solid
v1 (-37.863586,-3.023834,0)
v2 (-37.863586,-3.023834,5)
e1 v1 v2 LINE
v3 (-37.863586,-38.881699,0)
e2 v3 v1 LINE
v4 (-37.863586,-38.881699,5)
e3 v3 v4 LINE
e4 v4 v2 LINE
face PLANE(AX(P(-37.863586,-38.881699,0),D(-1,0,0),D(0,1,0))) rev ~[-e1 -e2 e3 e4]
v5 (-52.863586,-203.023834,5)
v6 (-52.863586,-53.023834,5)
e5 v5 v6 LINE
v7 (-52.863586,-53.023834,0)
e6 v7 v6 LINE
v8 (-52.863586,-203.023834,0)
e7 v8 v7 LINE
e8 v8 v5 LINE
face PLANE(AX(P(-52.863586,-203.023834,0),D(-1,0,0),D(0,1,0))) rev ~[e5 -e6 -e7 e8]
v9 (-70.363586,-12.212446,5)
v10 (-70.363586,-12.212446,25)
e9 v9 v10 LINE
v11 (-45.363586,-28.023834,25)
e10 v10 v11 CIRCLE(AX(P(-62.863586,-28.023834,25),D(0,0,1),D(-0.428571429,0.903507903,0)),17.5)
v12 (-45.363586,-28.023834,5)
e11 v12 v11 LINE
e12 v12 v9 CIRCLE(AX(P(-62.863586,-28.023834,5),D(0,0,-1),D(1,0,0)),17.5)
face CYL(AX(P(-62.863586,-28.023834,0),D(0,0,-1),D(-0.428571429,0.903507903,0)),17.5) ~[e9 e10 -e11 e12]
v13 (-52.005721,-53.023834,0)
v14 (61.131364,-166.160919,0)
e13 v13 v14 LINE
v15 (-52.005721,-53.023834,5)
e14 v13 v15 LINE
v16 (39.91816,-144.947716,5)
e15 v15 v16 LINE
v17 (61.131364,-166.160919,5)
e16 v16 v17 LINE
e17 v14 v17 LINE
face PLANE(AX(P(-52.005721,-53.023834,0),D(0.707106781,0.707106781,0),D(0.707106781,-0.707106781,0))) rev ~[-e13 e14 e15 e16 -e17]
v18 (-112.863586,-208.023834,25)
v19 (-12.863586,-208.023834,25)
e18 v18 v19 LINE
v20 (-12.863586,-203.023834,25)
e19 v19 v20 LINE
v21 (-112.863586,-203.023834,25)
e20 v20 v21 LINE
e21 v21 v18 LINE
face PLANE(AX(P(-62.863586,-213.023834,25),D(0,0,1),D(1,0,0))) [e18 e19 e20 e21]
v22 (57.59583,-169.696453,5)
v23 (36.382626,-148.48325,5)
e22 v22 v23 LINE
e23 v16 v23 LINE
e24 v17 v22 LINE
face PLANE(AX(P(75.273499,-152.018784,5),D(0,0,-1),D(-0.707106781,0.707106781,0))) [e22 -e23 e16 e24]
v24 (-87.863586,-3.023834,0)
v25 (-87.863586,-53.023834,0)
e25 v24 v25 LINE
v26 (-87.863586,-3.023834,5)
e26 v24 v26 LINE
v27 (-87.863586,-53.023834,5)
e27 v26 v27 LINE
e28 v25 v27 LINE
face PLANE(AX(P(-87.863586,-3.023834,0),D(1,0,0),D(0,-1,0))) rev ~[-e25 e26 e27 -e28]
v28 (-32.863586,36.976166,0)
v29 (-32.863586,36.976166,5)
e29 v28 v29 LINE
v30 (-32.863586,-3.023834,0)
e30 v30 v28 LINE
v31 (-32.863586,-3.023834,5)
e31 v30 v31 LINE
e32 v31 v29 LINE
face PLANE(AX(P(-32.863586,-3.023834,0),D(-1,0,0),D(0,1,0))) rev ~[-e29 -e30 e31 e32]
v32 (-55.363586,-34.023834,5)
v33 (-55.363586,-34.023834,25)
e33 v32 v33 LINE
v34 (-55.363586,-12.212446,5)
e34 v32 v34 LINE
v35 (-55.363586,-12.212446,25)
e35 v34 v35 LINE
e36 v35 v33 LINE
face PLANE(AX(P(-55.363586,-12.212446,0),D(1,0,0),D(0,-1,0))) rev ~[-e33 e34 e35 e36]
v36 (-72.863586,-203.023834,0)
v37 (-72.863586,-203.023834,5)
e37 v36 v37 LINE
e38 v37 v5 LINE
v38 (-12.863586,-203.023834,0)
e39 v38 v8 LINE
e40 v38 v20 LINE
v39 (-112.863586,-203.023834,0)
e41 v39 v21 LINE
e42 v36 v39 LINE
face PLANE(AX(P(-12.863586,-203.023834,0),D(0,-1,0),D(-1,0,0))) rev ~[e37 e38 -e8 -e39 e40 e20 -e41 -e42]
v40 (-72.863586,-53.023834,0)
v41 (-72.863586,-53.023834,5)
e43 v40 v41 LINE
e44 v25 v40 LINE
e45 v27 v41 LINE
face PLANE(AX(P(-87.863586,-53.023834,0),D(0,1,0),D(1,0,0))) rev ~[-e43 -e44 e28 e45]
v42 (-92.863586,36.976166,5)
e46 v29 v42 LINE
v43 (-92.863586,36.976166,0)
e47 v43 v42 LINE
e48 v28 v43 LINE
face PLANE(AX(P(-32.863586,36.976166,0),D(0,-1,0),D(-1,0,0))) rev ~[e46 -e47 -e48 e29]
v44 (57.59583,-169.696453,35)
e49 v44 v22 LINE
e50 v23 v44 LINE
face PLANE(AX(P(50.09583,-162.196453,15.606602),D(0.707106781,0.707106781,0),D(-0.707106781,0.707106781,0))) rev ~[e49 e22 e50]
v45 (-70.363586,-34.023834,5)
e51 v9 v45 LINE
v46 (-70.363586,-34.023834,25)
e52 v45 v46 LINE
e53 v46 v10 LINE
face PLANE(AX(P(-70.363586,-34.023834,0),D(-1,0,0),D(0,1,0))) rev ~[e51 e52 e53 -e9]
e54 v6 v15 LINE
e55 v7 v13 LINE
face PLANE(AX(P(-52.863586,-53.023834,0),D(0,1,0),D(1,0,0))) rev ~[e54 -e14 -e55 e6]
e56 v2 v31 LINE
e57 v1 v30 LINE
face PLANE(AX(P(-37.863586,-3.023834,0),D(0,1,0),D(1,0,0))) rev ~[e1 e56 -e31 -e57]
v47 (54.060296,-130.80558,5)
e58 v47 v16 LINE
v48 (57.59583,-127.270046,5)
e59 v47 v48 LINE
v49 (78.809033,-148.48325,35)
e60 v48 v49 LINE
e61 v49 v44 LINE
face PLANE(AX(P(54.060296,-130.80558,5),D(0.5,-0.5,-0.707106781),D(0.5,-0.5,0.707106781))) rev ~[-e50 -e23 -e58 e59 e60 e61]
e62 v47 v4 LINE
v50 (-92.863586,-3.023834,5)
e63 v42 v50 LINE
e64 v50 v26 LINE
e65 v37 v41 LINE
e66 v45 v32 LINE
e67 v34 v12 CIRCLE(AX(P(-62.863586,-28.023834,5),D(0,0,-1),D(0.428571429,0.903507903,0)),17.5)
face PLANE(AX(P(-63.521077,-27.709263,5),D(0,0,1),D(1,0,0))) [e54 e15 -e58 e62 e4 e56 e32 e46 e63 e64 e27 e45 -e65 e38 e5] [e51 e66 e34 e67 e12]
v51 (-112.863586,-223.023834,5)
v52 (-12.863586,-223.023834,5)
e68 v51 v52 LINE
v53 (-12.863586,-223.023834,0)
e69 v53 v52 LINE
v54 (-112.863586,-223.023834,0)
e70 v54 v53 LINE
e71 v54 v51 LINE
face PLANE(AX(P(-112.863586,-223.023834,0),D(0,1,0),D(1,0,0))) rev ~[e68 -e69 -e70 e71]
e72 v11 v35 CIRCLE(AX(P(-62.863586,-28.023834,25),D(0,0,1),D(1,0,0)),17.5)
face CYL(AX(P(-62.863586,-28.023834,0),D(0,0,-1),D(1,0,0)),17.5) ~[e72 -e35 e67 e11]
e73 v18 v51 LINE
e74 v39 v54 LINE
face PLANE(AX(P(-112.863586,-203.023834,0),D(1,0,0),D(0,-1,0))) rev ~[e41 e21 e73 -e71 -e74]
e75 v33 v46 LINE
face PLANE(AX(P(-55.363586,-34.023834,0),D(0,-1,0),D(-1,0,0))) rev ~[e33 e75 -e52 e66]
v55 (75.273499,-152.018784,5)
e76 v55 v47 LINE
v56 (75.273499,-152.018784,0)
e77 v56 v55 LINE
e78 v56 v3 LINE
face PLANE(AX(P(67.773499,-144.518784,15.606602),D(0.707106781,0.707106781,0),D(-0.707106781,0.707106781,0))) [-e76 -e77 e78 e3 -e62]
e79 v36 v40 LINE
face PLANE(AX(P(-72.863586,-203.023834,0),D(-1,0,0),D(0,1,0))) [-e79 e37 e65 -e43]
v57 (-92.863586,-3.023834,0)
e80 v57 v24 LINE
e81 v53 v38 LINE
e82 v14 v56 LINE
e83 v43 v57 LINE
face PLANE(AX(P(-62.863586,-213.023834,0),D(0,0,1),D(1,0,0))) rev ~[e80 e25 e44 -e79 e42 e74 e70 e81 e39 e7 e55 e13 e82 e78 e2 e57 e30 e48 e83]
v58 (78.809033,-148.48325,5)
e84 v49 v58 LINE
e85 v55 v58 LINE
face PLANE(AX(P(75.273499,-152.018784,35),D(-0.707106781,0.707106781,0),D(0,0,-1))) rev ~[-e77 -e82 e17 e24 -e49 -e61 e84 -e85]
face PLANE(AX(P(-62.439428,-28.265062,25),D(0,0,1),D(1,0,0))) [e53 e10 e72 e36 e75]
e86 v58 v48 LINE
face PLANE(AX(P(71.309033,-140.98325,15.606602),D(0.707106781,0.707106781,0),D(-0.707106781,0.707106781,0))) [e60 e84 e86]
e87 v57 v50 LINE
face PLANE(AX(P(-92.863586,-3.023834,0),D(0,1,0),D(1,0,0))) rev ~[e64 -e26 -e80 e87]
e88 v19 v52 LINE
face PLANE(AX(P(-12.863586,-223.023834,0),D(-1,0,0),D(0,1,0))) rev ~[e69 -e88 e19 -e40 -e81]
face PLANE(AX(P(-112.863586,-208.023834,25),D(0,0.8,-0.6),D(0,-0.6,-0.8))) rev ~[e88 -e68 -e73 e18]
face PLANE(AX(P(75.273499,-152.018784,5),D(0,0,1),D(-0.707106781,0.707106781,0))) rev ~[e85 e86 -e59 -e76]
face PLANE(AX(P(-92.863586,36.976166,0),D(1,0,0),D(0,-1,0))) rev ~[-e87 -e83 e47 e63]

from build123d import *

# Parameters (mm, degrees)
F0_W          = 10
F0_H          = 150
F0_W_2        = 15
F0_H_2        = 31
F1_DEPTH      = 5
F2_DEPTH      = 25
F3_DEPTH      = 25
F5_DEPTH      = 25
F5_DEPTH_BACK = 5
F7_DEPTH      = 100


# Not quite as in the source:
# - a feature names something its author has since deleted; it is built from what else it names


with BuildPart() as f1:
    # F0 (on Top) → F1 (new body)
    with BuildSketch(Plane.XY):
        with BuildLine():
            Line((-70.3635856962, -3.0238344104), (-87.8635856962, -3.0238344104))
            Line((-87.8635856962, -3.0238344104), (-87.8635856962, -53.0238344104))
            Line((-87.8635856962, -53.0238344104), (-72.8635856962, -53.0238344104))
            Line((-72.8635856962, -53.0238344104), (-62.8635856962, -53.0238344104))
            Line((-62.8635856962, -53.0238344104), (-52.8635856962, -53.0238344104))
            Line((-52.8635856962, -53.0238344104), (-52.0057213199, -53.0238344104))
            Line((-52.0057213199, -53.0238344104), (-37.8635856962, -38.8816987866))
            Line((-37.8635856962, -38.8816987866), (-37.8635856962, -3.0238344104))
            Line((-37.8635856962, -3.0238344104), (-55.3635856962, -3.0238344104))
            Line((-55.3635856962, -3.0238344104), (-55.3635856962, -12.2124461095))
            ThreePointArc((-55.3635856962, -12.2124461095), (-48.0733862384, -18.6696909434), (-45.3635856962, -28.0238344104))
            ThreePointArc((-45.3635856962, -28.0238344104), (-72.2177291631, -42.8140338681), (-70.3635856962, -12.2124461095))
            Line((-70.3635856962, -12.2124461095), (-70.3635856962, -3.0238344104))
        make_face()
        with Locations((-67.8635856962, -128.0238344104)):
            Rectangle(F0_W, F0_H)
        with Locations((-57.8635856962, -128.0238344104)):
            Rectangle(F0_W, F0_H)
        Polygon((-37.8635856962, -53.0238344104), (-37.8635856962, -38.8816987866), (-52.0057213199, -53.0238344104), align=None)
        Polygon((75.2734992937, -152.0187837765), (-37.8635856962, -38.8816987866), (-37.8635856962, -53.0238344104), (-52.0057213199, -53.0238344104), (61.13136367, -166.1609194002), align=None)
        Polygon((-92.8635856962, -3.0238344104), (-87.8635856962, -3.0238344104), (-70.3635856962, -3.0238344104), (-70.3635856962, 27.9761655896), (-55.3635856962, 27.9761655896), (-55.3635856962, -3.0238344104), (-37.8635856962, -3.0238344104), (-32.8635856962, -3.0238344104), (-32.8635856962, 36.9761655896), (-92.8635856962, 36.9761655896), align=None)
        with Locations((-62.8635856962, 12.4761655896)):
            Rectangle(F0_W_2, F0_H_2)
        with BuildLine():
            Line((-55.3635856962, -3.0238344104), (-70.3635856962, -3.0238344104))
            Line((-70.3635856962, -3.0238344104), (-70.3635856962, -12.2124461095))
            ThreePointArc((-70.3635856962, -12.2124461095), (-62.8635856962, -10.5238344104), (-55.3635856962, -12.2124461095))
            Line((-55.3635856962, -12.2124461095), (-55.3635856962, -3.0238344104))
        make_face()
        with BuildLine():
            ThreePointArc((-55.3635856962, -12.2124461095), (-62.8635856962, -10.5238344104), (-70.3635856962, -12.2124461095))
            Line((-70.3635856962, -12.2124461095), (-70.3635856962, -34.0238344104))
            Line((-70.3635856962, -34.0238344104), (-55.3635856962, -34.0238344104))
            Line((-55.3635856962, -34.0238344104), (-55.3635856962, -12.2124461095))
        make_face()
    extrude(amount=F1_DEPTH)

    # F0 (on Top) → F2 (join)
    with BuildSketch(Plane.XY):
        with BuildLine():
            Line((-70.3635856962, -34.0238344104), (-70.3635856962, -12.2124461095))
            ThreePointArc((-70.3635856962, -12.2124461095), (-72.2177291631, -42.8140338681), (-45.3635856962, -28.0238344104))
            ThreePointArc((-45.3635856962, -28.0238344104), (-48.0733862384, -18.6696909434), (-55.3635856962, -12.2124461095))
            Line((-55.3635856962, -12.2124461095), (-55.3635856962, -34.0238344104))
            Line((-55.3635856962, -34.0238344104), (-70.3635856962, -34.0238344104))
        make_face()
    extrude(amount=F2_DEPTH)

    # F0 (on Top) → F3 (join)
    with BuildSketch(Plane.XY):
        Polygon((-62.8635856962, -203.0238344104), (-72.8635856962, -203.0238344104), (-112.8635856962, -203.0238344104), (-112.8635856962, -223.0238344104), (-12.8635856962, -223.0238344104), (-12.8635856962, -203.0238344104), (-52.8635856962, -203.0238344104), align=None)
    extrude(amount=F3_DEPTH)

    # F4 (on face) → F5 (join, two sides)
    with BuildSketch(Plane(origin=(-38.3726422414, -38.3726422414, 0), x_dir=(-0.7071067812, 0.7071067812, 0), z_dir=(0.7071067812, 0.7071067812, 0))) as f5_sk:
        Polygon((-160.7199146703, 35), (-160.7199146703, 5), (-130.7199146703, 5), align=None)
    extrude(amount=-F5_DEPTH)
    extrude(f5_sk.sketch, amount=F5_DEPTH_BACK)

    # F6 (on face) → F7 (cut, through all)
    with BuildSketch(Plane(origin=(-112.8635856962, 0, 0), x_dir=(0, -1, 0), z_dir=(-1, 0, 0))):
        Polygon((223.0238344104, 25), (208.0238344104, 25), (223.0238344104, 5), align=None)
    extrude(amount=-F7_DEPTH, mode=Mode.SUBTRACT)


solid = f1.part
